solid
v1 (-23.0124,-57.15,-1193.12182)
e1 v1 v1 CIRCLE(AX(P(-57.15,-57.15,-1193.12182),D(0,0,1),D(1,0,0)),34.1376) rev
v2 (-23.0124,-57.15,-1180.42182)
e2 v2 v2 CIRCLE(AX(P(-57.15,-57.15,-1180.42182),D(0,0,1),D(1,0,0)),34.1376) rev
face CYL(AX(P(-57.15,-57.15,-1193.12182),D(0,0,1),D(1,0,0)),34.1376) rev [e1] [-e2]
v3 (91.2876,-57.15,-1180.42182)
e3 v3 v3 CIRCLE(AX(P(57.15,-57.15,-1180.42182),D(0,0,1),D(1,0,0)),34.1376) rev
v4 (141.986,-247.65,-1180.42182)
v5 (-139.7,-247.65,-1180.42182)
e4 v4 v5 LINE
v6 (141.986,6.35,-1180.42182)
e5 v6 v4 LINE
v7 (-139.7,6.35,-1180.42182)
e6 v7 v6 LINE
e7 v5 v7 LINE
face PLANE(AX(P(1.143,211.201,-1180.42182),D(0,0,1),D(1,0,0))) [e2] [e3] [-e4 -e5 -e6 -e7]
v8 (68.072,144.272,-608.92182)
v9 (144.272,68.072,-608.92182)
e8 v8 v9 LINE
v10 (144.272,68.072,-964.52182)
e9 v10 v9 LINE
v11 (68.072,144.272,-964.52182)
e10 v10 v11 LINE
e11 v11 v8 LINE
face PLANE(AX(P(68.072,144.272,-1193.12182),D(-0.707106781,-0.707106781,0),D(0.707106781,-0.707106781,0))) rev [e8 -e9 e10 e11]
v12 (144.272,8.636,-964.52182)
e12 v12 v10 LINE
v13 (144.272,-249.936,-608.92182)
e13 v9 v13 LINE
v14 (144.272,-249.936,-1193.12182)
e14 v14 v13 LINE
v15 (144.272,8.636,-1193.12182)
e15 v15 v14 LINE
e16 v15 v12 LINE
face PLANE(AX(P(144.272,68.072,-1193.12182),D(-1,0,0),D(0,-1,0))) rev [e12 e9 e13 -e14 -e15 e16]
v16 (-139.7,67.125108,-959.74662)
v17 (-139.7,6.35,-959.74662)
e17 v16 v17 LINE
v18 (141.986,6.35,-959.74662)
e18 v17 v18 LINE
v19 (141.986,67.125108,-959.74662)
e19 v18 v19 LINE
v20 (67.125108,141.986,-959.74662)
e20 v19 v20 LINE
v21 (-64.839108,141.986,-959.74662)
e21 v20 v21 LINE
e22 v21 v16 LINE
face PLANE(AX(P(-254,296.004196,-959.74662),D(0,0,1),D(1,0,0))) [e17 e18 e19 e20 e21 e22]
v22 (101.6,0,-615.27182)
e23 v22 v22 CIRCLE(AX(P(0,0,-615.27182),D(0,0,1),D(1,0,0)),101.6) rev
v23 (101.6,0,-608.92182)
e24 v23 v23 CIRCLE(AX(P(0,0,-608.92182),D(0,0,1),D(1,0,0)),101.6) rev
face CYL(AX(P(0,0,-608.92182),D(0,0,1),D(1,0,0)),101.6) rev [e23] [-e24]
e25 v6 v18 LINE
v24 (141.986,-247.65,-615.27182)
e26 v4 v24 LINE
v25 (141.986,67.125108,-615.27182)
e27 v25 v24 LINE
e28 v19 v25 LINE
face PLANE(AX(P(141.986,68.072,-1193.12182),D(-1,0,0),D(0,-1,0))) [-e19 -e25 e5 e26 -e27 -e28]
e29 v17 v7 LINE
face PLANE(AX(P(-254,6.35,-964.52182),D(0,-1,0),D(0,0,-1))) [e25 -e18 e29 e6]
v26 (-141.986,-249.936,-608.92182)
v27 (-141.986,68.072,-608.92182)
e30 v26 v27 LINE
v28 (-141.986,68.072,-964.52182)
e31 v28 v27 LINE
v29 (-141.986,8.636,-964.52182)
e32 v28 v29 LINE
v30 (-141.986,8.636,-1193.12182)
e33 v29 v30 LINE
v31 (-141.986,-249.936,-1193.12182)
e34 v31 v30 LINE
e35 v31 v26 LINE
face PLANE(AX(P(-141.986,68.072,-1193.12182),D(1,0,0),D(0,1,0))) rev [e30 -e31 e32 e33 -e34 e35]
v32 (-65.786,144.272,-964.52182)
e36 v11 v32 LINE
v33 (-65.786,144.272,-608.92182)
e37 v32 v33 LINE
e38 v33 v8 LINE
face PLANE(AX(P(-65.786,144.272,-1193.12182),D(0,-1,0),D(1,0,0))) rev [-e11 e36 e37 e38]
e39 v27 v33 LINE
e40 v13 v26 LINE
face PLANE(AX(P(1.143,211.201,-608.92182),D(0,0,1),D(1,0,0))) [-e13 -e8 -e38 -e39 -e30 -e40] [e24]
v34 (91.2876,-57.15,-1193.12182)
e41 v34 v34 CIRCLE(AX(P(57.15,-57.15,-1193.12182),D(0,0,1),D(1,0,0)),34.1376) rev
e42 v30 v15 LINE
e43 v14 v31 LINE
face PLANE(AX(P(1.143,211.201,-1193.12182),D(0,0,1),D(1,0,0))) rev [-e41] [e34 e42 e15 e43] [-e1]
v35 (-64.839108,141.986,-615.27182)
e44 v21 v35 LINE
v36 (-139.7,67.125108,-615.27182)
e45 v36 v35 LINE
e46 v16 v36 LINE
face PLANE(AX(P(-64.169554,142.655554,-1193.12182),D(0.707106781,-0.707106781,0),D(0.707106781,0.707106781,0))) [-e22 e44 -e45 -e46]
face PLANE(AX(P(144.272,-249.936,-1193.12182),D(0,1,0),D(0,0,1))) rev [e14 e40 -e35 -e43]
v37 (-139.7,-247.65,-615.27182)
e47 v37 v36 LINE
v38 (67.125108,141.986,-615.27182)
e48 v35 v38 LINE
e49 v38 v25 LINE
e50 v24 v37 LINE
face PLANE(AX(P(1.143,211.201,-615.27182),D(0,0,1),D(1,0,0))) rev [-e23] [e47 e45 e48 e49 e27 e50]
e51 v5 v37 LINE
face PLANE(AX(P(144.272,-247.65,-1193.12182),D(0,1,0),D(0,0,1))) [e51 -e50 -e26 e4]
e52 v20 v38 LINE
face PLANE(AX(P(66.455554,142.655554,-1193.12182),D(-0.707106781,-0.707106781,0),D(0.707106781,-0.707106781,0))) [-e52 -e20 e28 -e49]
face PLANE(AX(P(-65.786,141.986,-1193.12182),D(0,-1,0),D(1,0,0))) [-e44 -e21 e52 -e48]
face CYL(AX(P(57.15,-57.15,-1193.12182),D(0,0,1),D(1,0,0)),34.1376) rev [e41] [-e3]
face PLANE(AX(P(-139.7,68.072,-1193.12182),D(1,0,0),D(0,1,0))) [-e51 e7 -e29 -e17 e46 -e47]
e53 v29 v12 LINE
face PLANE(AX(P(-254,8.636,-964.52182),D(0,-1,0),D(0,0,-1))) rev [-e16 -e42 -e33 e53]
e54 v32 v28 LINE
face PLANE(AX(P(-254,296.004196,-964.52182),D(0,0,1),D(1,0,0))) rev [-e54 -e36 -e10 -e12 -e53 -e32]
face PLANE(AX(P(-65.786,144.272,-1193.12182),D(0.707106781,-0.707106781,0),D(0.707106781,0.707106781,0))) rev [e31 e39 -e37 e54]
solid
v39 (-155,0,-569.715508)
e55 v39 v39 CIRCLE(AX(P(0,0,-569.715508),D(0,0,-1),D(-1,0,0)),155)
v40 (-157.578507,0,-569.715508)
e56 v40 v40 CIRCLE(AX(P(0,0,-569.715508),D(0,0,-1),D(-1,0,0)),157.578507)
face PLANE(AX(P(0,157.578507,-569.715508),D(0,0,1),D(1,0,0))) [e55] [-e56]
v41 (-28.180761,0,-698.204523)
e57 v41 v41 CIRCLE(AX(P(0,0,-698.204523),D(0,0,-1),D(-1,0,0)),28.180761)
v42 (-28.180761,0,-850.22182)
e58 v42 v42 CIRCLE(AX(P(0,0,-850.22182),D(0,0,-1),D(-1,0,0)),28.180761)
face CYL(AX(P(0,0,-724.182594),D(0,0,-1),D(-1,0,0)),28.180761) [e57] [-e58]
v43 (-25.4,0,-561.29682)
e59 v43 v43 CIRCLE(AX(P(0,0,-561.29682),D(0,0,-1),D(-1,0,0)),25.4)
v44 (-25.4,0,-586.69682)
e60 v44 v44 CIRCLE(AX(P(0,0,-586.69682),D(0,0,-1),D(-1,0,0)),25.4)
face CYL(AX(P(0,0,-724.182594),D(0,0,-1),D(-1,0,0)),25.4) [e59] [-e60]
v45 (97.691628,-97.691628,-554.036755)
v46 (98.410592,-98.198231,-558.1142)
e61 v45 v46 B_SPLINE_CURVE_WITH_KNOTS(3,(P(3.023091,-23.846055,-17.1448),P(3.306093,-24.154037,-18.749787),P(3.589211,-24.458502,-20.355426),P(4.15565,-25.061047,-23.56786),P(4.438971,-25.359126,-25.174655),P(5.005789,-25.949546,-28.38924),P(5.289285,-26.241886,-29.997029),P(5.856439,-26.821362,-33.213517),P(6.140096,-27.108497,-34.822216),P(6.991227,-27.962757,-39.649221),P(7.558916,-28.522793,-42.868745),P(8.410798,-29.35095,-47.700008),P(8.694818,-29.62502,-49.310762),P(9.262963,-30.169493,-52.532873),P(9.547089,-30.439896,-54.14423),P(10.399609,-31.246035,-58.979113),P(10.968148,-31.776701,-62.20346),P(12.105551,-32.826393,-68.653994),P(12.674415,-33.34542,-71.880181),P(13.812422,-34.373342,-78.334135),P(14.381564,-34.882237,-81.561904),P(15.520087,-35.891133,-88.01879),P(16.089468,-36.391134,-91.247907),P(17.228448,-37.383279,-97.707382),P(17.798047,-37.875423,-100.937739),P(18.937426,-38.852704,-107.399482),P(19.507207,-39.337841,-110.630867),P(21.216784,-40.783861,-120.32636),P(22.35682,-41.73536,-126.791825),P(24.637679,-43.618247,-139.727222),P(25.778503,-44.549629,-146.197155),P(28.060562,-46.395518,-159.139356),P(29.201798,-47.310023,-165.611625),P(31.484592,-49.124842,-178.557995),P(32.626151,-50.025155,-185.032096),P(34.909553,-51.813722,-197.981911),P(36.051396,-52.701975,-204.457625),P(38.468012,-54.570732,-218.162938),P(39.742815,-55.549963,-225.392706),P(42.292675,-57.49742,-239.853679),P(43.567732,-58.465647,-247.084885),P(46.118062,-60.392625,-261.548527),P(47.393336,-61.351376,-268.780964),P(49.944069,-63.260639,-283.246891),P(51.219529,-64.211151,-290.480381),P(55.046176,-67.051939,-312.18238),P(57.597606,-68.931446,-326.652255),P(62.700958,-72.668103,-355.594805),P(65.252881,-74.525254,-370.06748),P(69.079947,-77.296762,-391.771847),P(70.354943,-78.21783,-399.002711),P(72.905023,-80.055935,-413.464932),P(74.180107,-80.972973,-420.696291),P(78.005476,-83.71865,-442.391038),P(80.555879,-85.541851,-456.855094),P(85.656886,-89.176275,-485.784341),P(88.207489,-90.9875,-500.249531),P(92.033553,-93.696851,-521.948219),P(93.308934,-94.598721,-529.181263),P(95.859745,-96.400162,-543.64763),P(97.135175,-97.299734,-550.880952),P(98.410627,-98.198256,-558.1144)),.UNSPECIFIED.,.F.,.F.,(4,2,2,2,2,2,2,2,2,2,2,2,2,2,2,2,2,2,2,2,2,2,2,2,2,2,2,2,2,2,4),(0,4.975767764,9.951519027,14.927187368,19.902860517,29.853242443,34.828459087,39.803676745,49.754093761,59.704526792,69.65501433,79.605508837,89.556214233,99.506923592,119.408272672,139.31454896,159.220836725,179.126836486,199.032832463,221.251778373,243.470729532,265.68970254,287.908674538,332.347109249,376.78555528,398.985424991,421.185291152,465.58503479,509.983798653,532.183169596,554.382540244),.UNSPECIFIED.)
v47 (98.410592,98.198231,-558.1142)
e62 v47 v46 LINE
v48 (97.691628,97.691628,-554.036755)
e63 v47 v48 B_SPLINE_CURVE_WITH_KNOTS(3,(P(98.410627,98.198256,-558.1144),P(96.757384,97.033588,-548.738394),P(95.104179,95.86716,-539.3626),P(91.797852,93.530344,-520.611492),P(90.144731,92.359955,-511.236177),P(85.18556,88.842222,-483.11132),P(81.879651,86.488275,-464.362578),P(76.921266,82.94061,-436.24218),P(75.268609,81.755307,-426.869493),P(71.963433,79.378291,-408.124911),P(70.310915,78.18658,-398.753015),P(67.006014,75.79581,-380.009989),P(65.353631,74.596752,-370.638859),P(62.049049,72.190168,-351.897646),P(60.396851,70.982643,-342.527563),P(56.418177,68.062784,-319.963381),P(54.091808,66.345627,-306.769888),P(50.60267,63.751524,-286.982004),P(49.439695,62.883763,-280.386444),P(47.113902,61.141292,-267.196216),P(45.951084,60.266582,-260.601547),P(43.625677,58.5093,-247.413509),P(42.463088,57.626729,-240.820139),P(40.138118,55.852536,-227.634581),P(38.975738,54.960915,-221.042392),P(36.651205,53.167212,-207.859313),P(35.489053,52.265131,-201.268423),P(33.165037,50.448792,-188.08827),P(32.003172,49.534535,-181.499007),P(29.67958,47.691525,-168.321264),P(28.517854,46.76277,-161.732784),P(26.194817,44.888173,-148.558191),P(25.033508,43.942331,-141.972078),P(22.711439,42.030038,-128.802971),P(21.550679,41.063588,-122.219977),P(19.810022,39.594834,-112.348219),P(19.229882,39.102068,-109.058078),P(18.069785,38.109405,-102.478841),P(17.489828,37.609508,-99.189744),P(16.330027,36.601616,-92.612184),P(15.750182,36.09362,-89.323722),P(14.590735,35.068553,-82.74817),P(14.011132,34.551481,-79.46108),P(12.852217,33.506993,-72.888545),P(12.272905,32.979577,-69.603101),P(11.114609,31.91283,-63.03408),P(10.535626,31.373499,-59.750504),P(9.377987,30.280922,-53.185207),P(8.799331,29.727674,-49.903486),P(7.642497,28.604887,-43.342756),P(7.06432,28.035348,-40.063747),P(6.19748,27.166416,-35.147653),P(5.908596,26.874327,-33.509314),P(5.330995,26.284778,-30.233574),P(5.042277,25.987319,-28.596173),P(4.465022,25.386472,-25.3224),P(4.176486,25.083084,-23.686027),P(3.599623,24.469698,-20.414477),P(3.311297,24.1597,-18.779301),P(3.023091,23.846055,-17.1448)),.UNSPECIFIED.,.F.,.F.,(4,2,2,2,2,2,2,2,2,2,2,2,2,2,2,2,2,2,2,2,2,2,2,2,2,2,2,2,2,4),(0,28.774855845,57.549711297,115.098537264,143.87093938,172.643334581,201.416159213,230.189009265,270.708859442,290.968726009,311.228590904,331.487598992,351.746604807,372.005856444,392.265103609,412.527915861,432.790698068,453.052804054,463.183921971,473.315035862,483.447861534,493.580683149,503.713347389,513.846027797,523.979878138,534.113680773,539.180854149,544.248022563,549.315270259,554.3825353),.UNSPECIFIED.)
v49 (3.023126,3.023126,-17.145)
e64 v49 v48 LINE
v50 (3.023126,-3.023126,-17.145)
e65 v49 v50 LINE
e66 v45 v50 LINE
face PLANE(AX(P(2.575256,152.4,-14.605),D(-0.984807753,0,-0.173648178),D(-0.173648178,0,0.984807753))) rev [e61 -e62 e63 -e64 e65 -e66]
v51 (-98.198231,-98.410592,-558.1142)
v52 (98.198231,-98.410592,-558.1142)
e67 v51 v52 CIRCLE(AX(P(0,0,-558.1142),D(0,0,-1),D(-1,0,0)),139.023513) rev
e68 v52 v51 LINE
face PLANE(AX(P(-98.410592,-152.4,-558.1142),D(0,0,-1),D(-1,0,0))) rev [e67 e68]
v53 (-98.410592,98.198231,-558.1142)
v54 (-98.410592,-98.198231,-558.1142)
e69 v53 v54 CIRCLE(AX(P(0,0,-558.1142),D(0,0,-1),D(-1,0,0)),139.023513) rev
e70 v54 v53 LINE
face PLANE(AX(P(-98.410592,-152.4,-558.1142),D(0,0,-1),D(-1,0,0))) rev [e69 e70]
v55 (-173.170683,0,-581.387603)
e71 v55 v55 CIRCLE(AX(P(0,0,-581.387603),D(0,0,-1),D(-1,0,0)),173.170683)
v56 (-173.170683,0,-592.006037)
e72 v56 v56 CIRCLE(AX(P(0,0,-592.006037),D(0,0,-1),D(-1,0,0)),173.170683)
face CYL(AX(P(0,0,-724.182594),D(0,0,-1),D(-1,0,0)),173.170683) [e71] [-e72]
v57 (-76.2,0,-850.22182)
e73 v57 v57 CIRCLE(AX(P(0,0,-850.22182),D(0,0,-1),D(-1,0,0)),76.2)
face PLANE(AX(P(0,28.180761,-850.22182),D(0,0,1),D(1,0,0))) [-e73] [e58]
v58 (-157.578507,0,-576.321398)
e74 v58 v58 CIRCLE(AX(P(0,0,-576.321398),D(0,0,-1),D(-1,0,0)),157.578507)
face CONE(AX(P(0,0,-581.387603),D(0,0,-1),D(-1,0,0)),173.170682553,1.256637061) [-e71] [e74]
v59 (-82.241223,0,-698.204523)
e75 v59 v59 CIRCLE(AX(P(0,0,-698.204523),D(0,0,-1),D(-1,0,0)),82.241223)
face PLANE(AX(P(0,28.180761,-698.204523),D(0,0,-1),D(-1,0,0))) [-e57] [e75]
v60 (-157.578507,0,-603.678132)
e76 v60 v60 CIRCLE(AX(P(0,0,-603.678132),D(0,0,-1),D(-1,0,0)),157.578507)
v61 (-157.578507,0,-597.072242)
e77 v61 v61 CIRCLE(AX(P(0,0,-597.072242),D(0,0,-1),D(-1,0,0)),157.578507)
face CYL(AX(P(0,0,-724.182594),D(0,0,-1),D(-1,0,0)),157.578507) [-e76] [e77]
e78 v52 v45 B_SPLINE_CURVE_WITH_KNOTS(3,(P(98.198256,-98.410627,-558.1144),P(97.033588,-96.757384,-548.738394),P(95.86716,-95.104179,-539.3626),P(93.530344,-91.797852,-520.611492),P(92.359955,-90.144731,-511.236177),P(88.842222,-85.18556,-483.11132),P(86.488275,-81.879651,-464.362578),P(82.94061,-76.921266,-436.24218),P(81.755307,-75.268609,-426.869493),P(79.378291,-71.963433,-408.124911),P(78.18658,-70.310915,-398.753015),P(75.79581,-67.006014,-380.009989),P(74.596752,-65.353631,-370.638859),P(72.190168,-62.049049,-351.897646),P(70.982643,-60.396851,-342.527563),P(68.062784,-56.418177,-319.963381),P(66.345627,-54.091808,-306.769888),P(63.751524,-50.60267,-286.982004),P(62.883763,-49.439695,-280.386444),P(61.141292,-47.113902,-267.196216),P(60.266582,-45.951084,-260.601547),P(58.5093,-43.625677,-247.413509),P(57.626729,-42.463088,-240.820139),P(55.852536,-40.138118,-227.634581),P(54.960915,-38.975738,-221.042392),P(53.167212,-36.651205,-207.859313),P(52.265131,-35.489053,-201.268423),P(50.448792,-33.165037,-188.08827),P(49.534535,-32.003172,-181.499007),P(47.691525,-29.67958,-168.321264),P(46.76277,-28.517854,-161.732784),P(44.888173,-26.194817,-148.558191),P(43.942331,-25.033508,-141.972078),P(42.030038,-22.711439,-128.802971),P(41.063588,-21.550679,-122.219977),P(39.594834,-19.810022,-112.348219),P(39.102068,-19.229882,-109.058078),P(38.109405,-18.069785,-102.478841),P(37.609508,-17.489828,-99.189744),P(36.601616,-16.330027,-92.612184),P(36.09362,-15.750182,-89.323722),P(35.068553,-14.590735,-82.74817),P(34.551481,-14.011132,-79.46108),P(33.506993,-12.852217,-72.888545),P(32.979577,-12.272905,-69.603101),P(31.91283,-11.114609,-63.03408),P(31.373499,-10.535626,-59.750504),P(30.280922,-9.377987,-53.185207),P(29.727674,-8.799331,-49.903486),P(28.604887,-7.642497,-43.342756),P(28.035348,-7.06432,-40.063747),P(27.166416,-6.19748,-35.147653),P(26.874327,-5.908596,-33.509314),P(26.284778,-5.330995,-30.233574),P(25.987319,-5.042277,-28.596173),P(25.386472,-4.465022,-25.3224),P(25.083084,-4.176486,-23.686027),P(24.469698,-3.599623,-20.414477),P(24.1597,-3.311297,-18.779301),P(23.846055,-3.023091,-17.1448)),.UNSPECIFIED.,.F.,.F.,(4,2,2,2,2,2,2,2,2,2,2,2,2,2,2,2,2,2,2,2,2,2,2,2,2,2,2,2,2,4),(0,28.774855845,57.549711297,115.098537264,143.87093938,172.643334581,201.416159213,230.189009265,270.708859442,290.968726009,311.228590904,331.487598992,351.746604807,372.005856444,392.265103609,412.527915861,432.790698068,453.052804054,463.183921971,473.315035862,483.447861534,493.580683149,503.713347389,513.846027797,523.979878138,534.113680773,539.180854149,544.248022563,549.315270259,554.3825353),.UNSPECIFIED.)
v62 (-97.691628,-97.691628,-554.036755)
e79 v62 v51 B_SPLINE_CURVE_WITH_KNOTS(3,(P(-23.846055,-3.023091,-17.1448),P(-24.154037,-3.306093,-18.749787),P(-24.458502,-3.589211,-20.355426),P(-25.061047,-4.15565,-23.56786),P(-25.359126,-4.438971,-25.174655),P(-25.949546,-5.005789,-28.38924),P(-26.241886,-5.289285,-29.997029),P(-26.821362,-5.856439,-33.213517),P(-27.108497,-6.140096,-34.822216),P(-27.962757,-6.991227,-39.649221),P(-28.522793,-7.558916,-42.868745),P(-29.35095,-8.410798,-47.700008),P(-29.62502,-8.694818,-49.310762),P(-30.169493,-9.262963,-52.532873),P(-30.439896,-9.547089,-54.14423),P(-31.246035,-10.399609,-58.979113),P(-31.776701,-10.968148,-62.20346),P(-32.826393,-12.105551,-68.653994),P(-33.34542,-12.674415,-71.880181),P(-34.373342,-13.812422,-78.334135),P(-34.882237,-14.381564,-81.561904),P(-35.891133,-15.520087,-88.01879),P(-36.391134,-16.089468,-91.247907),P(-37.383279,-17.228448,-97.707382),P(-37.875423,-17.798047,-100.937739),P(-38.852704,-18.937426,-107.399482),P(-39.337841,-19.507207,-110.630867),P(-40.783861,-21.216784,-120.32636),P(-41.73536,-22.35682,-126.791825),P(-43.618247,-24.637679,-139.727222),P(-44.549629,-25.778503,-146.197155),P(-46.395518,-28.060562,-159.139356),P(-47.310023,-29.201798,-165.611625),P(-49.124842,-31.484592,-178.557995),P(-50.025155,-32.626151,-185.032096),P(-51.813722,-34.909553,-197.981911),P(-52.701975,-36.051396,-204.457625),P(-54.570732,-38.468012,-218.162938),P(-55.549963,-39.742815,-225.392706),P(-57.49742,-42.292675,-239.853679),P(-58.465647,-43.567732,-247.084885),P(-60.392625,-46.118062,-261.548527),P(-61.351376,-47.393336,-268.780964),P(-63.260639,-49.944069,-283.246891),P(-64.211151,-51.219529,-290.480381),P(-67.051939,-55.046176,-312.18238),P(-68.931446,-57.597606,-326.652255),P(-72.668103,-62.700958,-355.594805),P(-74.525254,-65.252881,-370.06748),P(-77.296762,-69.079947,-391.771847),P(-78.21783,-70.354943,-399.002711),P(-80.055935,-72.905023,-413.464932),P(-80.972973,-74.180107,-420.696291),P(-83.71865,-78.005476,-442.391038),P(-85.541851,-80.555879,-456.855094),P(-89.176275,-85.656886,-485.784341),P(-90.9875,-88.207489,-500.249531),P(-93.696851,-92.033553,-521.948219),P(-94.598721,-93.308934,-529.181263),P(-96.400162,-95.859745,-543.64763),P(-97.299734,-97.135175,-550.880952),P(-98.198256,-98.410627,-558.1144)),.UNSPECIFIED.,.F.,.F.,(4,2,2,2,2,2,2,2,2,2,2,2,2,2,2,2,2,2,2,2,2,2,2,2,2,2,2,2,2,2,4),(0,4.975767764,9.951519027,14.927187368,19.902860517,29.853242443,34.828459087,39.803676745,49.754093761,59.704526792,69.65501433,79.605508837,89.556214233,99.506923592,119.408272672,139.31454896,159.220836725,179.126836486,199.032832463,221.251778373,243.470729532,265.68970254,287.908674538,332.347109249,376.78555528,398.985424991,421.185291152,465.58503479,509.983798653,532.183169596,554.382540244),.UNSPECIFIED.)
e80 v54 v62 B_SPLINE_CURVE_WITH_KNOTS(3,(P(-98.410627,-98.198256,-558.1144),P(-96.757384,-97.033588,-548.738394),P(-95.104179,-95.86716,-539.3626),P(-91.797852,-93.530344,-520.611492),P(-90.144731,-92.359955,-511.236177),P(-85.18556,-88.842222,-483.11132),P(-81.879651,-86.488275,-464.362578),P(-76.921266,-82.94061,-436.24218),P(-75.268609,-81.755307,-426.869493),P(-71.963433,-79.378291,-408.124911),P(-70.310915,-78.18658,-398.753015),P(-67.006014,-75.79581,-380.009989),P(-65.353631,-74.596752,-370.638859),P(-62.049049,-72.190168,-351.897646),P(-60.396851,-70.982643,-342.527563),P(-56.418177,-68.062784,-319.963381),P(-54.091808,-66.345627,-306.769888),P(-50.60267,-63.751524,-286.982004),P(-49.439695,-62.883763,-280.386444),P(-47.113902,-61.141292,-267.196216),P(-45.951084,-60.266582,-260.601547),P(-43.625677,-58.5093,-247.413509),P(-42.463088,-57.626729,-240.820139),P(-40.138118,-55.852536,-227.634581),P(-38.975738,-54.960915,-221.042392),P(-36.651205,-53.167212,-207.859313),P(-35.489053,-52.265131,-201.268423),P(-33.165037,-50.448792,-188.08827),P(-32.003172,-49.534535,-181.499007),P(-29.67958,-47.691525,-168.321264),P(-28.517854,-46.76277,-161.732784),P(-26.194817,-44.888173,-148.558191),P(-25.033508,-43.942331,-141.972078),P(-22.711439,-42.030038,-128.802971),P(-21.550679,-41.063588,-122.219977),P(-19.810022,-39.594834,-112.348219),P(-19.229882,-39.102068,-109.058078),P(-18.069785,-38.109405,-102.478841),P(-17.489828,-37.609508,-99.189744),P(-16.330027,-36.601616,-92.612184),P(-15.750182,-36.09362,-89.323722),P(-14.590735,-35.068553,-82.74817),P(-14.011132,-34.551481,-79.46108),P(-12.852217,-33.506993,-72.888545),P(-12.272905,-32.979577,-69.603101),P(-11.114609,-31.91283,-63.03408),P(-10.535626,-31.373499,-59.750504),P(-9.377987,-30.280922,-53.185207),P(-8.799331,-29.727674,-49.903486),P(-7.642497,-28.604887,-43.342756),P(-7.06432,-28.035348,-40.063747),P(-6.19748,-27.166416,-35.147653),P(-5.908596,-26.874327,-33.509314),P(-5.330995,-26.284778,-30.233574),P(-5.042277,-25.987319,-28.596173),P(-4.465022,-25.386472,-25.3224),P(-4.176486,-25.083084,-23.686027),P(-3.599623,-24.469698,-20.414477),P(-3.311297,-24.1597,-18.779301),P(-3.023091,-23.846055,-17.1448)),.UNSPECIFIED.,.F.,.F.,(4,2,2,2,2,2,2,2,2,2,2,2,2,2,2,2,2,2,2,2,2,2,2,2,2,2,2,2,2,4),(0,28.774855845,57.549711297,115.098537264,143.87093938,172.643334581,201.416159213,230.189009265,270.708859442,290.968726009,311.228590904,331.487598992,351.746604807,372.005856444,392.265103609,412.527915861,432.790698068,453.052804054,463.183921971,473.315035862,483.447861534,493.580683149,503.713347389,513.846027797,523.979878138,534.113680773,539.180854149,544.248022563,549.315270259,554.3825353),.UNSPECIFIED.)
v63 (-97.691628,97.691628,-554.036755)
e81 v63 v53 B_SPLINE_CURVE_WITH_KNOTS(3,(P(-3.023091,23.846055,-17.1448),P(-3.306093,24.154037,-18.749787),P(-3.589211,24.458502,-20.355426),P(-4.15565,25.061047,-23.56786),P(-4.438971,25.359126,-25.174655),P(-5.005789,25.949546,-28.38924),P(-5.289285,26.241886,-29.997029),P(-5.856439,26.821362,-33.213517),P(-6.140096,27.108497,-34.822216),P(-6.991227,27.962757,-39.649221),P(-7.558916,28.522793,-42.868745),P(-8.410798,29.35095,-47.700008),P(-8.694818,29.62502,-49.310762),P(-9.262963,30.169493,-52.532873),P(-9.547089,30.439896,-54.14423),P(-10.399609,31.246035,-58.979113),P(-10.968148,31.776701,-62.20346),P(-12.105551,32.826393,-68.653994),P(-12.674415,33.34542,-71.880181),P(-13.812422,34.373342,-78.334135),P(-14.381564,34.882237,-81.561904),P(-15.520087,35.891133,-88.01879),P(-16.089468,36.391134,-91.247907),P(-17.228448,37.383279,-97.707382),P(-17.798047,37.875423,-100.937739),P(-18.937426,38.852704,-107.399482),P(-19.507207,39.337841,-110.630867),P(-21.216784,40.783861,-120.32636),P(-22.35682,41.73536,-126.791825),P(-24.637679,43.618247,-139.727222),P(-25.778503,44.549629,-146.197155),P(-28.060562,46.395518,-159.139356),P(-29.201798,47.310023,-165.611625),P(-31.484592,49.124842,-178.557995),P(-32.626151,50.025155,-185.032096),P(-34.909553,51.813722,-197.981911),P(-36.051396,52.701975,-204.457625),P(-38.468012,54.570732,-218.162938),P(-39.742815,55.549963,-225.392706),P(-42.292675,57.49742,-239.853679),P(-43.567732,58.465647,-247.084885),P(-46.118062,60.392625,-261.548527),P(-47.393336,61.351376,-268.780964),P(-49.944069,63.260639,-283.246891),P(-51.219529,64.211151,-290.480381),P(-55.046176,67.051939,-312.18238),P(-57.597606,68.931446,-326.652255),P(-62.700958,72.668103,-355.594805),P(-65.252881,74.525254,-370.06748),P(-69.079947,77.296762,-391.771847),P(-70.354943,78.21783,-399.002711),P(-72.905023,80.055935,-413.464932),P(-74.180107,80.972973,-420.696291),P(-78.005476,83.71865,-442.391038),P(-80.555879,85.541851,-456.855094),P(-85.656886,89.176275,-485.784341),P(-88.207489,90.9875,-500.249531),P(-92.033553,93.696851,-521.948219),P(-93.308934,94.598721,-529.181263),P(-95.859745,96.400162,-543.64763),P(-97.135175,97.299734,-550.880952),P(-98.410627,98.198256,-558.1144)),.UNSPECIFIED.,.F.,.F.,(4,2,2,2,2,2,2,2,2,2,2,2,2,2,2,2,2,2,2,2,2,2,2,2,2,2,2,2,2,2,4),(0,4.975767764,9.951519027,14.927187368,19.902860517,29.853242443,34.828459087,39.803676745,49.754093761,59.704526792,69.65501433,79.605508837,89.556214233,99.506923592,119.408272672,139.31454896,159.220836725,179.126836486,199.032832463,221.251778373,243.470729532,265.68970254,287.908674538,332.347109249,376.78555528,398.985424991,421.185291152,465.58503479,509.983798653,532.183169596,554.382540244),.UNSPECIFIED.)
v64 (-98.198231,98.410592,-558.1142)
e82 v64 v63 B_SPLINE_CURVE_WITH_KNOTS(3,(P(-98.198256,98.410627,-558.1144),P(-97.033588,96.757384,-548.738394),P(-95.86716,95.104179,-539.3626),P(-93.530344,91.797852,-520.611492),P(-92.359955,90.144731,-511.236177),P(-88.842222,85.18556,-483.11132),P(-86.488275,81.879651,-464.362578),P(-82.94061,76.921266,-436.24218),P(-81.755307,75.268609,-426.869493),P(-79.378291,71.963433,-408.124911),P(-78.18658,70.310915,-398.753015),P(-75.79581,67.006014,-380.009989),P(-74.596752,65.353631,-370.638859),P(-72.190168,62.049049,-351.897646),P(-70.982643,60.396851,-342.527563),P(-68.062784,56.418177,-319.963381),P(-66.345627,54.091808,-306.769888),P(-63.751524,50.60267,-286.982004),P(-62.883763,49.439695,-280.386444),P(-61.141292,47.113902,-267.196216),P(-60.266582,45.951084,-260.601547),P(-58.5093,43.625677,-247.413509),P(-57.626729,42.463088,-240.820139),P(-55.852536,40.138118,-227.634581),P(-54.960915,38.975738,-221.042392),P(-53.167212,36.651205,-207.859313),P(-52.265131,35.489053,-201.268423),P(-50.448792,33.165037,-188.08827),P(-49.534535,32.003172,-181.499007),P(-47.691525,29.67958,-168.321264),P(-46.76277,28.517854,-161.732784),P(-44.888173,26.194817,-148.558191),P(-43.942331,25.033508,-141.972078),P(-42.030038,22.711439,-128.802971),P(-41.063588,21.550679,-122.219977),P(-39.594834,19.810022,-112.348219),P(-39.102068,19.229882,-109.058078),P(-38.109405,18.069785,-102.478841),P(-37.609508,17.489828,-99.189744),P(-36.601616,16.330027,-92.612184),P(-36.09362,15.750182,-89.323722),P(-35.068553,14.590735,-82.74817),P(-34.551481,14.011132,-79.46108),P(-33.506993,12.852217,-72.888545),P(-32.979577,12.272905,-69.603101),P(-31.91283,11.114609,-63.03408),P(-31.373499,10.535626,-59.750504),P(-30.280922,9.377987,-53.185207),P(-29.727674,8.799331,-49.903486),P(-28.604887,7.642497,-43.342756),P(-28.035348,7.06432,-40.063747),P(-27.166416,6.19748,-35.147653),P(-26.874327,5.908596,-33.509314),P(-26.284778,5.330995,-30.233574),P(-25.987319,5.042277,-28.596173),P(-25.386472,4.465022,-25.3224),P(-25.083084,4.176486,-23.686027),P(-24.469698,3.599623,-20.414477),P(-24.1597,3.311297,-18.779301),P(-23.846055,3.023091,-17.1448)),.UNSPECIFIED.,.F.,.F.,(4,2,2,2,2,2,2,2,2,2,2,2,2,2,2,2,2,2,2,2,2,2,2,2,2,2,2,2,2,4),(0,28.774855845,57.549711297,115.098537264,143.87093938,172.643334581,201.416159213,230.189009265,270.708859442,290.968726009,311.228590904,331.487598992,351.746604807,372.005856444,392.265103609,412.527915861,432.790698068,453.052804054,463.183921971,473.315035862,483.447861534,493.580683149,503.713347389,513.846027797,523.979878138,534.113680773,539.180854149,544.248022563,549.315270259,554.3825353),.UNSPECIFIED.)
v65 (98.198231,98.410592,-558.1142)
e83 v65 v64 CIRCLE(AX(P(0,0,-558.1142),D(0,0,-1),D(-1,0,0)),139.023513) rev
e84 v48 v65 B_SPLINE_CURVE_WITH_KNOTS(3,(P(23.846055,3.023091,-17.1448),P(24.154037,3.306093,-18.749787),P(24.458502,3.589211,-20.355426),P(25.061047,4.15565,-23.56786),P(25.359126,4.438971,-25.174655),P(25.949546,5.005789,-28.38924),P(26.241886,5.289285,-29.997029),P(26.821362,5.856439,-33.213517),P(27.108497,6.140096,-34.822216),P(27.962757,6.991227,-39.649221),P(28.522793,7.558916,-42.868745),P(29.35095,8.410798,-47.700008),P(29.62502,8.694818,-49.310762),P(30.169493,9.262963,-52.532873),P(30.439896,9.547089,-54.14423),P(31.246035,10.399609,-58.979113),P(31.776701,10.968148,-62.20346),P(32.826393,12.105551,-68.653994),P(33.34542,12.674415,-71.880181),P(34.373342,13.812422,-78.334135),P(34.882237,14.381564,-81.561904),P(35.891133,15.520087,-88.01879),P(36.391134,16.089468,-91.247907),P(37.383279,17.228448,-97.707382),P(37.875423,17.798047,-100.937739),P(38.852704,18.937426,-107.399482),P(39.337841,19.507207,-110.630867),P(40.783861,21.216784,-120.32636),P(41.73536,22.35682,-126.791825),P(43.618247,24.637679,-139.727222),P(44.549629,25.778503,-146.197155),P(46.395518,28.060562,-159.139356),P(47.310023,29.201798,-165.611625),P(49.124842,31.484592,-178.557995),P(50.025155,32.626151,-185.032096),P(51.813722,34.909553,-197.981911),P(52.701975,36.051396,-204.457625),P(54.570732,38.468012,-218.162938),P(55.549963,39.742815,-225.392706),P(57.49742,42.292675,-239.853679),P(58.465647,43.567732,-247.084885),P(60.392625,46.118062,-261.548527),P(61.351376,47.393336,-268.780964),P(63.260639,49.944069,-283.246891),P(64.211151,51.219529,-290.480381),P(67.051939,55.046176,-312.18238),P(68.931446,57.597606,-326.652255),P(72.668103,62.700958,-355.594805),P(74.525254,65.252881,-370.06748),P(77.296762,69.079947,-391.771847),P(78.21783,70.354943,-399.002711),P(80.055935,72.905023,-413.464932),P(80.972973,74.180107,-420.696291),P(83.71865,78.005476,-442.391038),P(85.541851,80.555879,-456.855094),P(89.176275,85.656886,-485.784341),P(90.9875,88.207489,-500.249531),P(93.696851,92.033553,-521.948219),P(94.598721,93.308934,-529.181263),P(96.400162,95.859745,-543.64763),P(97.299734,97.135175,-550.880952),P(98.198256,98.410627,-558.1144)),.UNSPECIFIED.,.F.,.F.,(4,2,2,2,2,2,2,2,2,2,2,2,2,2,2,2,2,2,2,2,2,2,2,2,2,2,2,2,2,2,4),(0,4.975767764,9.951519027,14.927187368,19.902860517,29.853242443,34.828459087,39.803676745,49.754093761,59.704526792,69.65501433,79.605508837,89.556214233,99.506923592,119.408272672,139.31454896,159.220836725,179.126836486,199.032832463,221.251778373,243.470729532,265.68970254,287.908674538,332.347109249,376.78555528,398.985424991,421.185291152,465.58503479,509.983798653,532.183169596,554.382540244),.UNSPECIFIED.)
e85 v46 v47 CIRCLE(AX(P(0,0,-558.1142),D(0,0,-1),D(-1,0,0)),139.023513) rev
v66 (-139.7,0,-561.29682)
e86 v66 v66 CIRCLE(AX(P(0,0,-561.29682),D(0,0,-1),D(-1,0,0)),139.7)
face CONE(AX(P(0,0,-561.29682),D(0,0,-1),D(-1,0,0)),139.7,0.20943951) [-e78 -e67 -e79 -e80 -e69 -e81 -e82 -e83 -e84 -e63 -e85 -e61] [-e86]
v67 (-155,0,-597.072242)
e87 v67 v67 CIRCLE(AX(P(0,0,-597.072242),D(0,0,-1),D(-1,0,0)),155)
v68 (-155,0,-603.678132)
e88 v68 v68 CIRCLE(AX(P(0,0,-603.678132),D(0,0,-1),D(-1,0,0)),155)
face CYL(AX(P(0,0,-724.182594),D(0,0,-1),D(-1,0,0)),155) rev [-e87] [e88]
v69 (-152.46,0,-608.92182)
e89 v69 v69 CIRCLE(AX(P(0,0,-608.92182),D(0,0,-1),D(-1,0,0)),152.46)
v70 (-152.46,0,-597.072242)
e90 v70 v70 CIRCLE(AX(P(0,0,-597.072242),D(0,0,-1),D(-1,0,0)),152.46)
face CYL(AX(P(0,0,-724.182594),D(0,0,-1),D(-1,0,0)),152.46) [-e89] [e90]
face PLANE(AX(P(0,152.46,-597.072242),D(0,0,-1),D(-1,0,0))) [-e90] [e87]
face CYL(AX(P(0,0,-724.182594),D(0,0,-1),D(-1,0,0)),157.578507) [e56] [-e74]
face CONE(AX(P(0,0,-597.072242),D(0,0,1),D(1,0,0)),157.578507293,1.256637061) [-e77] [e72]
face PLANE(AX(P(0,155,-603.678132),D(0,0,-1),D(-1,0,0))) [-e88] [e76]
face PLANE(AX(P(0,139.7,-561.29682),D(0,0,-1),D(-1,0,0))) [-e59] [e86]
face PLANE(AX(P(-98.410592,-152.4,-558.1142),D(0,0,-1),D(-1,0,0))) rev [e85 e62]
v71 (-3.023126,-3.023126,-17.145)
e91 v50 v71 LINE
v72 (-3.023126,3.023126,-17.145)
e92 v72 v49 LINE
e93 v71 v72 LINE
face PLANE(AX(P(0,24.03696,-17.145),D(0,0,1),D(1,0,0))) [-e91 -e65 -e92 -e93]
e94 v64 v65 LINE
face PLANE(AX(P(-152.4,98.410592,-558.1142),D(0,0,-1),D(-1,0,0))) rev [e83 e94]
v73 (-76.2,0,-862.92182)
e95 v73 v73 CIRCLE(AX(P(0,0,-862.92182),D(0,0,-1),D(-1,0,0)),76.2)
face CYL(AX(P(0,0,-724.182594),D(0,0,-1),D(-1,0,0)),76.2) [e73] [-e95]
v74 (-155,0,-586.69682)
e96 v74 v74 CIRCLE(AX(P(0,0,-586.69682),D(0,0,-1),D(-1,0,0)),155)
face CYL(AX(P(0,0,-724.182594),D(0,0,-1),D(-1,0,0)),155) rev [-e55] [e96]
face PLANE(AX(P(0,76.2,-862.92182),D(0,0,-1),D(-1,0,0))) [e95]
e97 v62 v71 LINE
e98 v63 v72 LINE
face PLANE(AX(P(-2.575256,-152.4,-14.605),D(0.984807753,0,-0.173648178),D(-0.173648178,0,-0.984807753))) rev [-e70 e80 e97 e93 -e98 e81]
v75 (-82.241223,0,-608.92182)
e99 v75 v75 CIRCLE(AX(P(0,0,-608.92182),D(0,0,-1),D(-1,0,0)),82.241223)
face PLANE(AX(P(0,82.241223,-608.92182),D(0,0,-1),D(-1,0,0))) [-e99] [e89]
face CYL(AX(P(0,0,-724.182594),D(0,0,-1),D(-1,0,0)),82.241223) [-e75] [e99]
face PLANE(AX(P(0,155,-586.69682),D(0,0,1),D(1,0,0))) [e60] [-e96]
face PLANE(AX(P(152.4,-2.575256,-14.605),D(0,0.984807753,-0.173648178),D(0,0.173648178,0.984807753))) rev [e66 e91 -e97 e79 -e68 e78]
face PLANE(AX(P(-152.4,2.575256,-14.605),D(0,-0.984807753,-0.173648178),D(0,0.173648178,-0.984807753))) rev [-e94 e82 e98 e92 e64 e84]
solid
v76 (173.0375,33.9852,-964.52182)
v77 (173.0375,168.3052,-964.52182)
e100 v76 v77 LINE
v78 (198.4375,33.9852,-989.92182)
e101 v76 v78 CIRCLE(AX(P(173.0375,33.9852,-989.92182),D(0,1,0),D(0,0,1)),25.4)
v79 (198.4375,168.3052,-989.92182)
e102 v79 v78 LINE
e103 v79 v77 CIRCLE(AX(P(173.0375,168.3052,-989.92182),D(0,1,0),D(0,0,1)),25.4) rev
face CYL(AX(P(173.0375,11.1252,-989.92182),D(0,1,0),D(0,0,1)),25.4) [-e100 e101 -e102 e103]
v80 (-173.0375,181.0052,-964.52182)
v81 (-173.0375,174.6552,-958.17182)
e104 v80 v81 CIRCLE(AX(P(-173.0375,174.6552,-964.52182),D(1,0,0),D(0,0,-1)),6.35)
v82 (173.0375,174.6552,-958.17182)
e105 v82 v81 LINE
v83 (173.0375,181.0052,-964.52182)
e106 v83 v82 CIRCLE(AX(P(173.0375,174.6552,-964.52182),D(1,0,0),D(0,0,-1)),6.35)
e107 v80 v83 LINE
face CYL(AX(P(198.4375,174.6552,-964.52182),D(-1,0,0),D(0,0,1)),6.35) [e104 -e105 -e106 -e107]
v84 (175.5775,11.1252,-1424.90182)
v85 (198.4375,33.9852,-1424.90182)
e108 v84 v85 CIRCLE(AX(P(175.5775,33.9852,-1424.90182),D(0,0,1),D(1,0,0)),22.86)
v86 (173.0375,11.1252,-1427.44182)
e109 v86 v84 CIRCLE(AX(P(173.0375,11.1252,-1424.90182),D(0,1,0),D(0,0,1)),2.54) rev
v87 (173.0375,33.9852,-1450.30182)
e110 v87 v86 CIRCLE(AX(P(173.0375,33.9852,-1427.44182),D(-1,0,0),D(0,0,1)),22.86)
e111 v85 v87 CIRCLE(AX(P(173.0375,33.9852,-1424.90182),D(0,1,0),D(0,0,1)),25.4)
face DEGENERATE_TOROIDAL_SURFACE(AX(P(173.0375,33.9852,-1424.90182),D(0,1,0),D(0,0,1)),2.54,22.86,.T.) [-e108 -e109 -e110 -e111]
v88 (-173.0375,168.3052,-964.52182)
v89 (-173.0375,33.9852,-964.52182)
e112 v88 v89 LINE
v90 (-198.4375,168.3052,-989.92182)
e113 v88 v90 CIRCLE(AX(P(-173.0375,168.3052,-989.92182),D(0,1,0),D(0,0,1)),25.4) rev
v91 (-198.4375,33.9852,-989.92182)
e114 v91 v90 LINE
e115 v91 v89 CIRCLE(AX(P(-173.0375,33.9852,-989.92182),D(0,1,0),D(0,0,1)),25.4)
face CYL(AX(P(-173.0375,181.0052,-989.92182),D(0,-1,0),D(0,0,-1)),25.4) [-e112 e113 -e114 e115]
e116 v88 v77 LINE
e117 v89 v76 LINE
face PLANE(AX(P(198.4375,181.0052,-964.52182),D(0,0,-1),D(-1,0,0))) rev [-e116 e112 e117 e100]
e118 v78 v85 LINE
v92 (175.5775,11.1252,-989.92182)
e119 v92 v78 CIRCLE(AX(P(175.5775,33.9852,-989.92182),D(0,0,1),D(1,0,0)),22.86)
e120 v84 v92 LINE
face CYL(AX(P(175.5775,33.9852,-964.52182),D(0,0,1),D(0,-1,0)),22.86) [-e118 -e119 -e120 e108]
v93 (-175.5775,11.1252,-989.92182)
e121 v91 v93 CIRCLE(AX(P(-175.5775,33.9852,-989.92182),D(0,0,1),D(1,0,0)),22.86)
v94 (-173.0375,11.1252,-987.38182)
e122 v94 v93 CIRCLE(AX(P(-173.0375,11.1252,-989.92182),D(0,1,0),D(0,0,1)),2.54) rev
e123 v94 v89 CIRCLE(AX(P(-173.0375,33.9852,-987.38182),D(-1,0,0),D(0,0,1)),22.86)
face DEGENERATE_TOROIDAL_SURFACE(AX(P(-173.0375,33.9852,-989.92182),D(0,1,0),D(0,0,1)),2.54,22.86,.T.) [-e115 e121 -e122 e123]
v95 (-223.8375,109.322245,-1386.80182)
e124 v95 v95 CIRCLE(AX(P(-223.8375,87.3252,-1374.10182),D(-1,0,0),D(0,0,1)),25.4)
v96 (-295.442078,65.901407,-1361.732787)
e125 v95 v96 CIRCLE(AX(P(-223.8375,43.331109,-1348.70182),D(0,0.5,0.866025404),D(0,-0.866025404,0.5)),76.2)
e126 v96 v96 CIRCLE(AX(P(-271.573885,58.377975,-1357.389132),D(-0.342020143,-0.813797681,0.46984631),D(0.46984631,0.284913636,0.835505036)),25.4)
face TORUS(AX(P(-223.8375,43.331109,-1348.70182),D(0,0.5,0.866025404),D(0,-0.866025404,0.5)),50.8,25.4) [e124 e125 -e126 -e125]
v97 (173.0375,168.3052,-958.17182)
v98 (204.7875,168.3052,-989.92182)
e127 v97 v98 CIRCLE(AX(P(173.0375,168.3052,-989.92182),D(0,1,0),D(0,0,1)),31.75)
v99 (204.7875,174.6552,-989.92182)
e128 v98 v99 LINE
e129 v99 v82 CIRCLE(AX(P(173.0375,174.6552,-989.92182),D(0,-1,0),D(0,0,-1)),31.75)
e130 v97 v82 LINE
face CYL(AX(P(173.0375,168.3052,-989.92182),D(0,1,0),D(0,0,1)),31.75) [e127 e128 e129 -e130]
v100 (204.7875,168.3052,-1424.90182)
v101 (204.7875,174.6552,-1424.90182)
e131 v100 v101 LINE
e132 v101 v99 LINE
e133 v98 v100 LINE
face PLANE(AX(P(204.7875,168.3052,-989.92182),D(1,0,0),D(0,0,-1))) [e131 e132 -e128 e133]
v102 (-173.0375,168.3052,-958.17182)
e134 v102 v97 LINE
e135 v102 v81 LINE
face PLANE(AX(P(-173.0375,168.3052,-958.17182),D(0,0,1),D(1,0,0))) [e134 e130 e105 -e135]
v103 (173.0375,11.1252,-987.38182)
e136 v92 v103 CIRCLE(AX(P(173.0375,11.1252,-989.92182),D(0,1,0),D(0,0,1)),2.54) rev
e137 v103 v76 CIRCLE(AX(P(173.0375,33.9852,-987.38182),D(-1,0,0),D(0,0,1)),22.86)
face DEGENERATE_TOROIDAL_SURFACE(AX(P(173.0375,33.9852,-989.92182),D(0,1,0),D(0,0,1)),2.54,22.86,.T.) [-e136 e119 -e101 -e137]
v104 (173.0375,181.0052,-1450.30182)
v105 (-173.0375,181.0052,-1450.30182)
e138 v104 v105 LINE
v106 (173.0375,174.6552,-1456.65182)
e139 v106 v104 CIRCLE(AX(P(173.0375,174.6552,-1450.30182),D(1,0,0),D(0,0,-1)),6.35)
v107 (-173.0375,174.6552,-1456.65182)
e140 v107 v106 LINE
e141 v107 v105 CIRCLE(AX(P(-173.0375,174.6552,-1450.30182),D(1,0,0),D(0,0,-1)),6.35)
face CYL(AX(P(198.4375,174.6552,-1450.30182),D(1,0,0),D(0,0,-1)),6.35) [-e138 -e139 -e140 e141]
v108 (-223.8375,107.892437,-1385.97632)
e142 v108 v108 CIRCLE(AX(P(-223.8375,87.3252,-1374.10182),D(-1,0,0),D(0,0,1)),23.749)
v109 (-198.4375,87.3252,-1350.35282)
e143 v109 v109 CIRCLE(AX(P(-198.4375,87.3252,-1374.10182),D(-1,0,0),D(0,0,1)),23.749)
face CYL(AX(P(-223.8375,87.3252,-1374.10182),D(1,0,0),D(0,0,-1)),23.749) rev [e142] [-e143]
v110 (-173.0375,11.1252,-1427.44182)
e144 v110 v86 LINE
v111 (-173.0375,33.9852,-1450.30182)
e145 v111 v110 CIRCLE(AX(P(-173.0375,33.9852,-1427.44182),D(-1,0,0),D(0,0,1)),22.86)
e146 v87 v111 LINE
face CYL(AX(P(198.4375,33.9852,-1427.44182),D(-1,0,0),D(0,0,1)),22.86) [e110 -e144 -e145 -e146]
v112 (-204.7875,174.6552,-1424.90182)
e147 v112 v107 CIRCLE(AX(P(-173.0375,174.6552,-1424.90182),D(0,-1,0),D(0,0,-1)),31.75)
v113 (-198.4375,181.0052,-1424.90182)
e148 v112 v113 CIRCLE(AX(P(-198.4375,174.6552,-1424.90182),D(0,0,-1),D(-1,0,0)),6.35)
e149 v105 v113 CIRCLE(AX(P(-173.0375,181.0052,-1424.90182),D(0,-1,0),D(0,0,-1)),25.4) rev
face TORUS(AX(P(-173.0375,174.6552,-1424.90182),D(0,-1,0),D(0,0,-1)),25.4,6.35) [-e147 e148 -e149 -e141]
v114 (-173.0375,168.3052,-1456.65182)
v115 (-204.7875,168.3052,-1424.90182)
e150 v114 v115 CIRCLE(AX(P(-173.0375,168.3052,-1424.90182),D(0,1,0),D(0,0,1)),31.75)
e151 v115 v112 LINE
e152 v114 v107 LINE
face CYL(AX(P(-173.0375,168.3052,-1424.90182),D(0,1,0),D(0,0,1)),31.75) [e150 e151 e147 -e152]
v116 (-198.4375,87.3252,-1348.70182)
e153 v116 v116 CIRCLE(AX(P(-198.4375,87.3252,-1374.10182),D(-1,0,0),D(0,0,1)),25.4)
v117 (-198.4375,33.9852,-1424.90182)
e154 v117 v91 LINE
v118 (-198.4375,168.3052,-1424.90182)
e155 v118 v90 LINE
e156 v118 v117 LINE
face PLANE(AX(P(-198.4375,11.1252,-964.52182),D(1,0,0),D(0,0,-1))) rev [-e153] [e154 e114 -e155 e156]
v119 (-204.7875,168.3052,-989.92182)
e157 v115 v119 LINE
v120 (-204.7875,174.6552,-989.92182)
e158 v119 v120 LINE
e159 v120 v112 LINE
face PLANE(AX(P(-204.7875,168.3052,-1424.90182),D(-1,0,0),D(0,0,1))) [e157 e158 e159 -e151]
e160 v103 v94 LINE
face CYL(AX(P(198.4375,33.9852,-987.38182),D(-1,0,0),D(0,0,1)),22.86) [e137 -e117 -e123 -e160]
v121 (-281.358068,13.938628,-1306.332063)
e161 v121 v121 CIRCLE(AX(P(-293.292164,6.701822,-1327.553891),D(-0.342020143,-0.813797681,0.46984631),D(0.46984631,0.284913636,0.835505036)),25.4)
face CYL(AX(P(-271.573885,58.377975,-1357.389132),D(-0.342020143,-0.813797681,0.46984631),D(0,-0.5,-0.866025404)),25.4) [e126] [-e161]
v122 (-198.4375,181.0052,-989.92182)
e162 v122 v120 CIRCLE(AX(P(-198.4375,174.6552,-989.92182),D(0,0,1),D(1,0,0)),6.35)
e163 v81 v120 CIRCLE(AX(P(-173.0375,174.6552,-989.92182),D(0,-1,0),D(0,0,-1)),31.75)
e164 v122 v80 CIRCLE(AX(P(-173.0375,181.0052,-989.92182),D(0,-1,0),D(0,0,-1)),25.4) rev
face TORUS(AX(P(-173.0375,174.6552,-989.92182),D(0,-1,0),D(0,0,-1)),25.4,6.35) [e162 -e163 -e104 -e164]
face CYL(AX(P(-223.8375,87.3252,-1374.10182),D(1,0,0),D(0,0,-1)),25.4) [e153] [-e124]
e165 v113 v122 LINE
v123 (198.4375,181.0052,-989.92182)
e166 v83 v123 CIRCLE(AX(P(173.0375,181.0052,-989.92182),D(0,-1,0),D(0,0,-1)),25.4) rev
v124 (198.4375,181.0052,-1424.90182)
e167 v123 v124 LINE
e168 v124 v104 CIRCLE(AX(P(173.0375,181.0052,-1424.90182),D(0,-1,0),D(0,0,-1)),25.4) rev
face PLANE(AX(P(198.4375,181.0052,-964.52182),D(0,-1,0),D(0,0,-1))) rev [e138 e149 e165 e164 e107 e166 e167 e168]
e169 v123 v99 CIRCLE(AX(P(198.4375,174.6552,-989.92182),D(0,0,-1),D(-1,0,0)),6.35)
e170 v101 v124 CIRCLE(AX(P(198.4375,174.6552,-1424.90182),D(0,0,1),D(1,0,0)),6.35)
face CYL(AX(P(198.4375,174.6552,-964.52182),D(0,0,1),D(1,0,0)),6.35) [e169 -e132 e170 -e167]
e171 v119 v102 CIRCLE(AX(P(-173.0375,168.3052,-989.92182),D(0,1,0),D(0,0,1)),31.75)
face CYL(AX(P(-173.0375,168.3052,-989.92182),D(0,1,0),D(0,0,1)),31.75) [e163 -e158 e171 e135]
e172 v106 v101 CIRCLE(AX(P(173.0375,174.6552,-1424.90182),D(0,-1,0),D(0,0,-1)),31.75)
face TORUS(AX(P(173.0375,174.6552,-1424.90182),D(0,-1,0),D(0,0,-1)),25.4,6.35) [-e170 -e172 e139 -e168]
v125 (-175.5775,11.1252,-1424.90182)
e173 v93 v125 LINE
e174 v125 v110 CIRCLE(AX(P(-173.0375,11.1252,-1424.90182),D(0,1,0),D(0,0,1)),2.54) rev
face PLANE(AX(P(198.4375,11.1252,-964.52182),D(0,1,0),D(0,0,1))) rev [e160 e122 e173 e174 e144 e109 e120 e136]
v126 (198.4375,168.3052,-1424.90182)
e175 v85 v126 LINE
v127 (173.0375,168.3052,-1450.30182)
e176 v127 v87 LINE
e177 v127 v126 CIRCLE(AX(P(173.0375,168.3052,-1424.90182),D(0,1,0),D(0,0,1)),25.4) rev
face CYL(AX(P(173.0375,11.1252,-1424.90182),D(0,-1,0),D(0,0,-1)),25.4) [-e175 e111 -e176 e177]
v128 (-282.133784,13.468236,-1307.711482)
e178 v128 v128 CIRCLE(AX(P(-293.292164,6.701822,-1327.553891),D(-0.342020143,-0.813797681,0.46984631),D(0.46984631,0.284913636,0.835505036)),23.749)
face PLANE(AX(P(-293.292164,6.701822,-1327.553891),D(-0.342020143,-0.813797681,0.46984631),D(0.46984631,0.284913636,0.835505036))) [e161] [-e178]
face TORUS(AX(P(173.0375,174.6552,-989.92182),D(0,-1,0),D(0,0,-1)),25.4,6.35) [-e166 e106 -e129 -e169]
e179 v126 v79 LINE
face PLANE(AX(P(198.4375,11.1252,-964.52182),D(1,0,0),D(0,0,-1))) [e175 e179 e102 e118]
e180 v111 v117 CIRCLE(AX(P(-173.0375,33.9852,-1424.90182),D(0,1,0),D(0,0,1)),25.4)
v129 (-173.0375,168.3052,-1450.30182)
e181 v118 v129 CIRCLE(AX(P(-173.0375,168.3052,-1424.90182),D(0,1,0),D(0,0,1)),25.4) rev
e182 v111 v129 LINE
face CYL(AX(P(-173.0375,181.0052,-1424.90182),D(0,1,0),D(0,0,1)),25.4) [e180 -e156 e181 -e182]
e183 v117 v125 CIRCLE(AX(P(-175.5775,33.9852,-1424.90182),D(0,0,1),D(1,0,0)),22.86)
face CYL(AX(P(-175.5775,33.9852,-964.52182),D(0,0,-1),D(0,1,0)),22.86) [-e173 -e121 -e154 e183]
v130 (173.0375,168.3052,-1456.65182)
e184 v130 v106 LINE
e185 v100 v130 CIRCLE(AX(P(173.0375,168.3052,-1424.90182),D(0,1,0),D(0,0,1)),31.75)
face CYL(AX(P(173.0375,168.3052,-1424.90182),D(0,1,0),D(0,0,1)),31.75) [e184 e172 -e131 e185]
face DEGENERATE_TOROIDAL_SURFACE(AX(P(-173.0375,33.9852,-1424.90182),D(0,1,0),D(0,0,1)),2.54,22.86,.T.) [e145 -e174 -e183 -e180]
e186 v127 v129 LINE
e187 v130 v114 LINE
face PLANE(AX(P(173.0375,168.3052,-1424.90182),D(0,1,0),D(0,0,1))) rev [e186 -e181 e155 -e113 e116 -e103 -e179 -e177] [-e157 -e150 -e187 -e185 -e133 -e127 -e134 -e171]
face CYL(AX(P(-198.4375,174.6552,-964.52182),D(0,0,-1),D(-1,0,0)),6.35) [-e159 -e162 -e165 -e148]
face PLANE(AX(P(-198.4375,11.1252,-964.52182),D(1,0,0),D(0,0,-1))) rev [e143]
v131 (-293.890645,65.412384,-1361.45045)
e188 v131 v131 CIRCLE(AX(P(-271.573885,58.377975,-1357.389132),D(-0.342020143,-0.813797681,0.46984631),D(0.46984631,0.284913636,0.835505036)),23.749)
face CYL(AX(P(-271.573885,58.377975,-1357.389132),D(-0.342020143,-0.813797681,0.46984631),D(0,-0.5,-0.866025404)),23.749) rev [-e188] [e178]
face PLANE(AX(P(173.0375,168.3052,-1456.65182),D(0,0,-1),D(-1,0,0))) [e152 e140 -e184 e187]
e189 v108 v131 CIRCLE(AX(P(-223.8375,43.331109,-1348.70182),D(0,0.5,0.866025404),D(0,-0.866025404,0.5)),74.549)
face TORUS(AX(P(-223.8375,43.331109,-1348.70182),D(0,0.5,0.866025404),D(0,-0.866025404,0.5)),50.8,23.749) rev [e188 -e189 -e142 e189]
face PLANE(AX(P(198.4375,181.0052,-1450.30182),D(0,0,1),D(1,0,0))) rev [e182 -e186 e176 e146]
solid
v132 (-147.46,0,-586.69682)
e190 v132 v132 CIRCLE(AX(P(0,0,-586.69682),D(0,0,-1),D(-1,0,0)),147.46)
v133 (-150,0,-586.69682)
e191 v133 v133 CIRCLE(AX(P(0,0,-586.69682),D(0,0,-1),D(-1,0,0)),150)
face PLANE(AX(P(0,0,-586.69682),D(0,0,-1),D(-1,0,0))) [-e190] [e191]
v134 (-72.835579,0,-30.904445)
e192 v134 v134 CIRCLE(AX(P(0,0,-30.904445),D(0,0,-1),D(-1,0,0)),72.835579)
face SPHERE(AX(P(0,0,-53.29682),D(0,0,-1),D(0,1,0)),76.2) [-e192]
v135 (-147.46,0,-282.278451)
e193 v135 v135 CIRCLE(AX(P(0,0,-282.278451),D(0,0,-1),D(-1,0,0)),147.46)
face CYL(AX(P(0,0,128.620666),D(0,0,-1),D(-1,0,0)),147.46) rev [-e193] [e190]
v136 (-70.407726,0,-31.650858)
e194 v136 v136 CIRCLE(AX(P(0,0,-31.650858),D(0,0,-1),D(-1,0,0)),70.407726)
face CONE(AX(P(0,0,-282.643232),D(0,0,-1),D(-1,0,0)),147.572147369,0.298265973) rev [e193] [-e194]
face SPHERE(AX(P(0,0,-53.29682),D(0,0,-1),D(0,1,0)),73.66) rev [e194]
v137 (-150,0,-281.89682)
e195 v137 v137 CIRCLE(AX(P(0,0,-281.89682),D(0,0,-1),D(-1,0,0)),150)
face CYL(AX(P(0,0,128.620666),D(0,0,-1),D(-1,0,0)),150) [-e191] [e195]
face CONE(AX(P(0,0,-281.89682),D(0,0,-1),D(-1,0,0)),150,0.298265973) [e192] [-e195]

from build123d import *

# Parameters (mm, degrees)
CE_00_PYRAMID_FACE_DEPTH    = 152.4
CP_00_PYRAMID_FACES_COUNT   = 4
BOSS_EXTRUDE1_DEPTH         = 584.2
SKETCH12_W                  = 287.368195874
SKETCH12_H                  = 287.368195874
CUT_EXTRUDE6_DEPTH          = 254
SHELL8_START                = -1180.42182
SHELL8_OUTLINE_W            = 281.686
SHELL8_OUTLINE_H            = 254
SHELL8_DEPTH                = 565.15
SHELL8_START_2              = -959.74662
SHELL8_2_DEPTH              = 344.4748
SHELL8_START_3              = -615.27182
SHELL8_3_OUTLINE_R          = 101.6
SHELL8_3_DEPTH              = 6.35
SHELL8_START_4              = -1193.12182
SHELL8_4_OUTLINE_R          = 34.1376
SHELL8_4_DEPTH              = 12.7
SH_00_DOME_SHELL_T          = -2.54
SKETCH8_W                   = 485.78
SKETCH8_H                   = 169.88
BE_00_PAX_CASE_BOTTOM_DEPTH = 198.4375
FILLET1_R                   = 25.4
FILLET2_R                   = 22.86
BE_00_PAX_CASE_TOP_DEPTH    = 12.7
FILLET3_R                   = 6.35
SKETCH16_R                  = 25.4
SKETCH16_R_2                = 23.749


# Read off the part's stored shape, not the designer's step: Shell8
with BuildPart() as part:
    # Sketch1 → BR-00 Base Plate & Feed (revolve)
    with BuildSketch(Plane(origin=(0, 0, 0), x_dir=(0, 0, -1), z_dir=(1, 0, 0)), mode=Mode.PRIVATE) as br_00_base_plate_feed_sk:
        Polygon((586.69682, 155), (586.69682, 25.4), (561.29682, 25.4), (561.29682, 139.7), (17.145, 24.036960114), (17.145, 0), (862.92182, 0), (862.92182, 76.2), (850.22182, 76.2), (850.22182, 28.18076073), (698.204523227, 28.18076073), (698.204523227, 82.241223084), (608.92182, 82.241223084), (608.92182, 152.46), (597.072242205, 152.46), (597.072242205, 155), (603.678132318, 155), (603.678132318, 157.578507293), (597.072242205, 157.578507293), (592.006037356, 173.170682553), (581.387602644, 173.170682553), (576.321397795, 157.578507293), (569.715507682, 157.578507293), (569.715507682, 155), align=None)
    revolve(br_00_base_plate_feed_sk.sketch.rotate(Axis((0, 0, -724.182594249), (0, 0, 1)), 90), axis=Axis((0, 0, -724.182594249), (0, 0, 1)))

    # Sketch2 → CE-00 Pyramid Face (cut, symmetric)
    with BuildSketch(Plane(origin=(0, 0, 0), x_dir=(0, 0, -1), z_dir=(1, 0, 0))):
        Polygon((14.605, 2.575255553), (558.1142, 98.410591777), (558.1142, 230.90250219), (14.605, 230.90250219), align=None)
    ce_00_pyramid_face = extrude(amount=CE_00_PYRAMID_FACE_DEPTH, both=True, mode=Mode.SUBTRACT)

    # CP-00 Pyramid Faces: CE-00 Pyramid Face ×4 about axis
    cp_00_pyramid_faces_axis = Axis((0, 0, 0), (0, 0, 1))
    for i in range(1, CP_00_PYRAMID_FACES_COUNT):
        add(ce_00_pyramid_face.rotate(cp_00_pyramid_faces_axis, i * 360 / CP_00_PYRAMID_FACES_COUNT), mode=Mode.SUBTRACT)


with BuildPart() as body_2:
    # Sketch3 → Boss-Extrude1 (new body)
    with BuildSketch(Plane(origin=(0, 0, -608.92182), x_dir=(-1, 0, 0), z_dir=(0, 0, -1))):
        Polygon((65.786, 144.272), (-68.072, 144.272), (-144.272, 68.072), (-144.272, -249.936), (141.986, -249.936), (141.986, 68.072), align=None)
    extrude(amount=BOSS_EXTRUDE1_DEPTH)

    # Sketch12 → Cut-Extrude6 (cut, symmetric)
    with BuildSketch(Plane(origin=(0, 0, 0), x_dir=(0, 0, -1), z_dir=(1, 0, 0))):
        with Locations((1108.205917937, 152.320097937)):
            Rectangle(SKETCH12_W, SKETCH12_H)
    extrude(amount=CUT_EXTRUDE6_DEPTH, both=True, mode=Mode.SUBTRACT)

    # Shell8 outline → Shell8 (cut)
    with BuildSketch(Plane.XY.offset(SHELL8_START)):
        with Locations((1.143, -120.65)):
            Rectangle(SHELL8_OUTLINE_W, SHELL8_OUTLINE_H)
    extrude(amount=SHELL8_DEPTH, mode=Mode.SUBTRACT)

    # Shell8 2 outline → Shell8 2 (cut)
    with BuildSketch(Plane.XY.offset(SHELL8_START_2)):
        Polygon((141.986, 6.35), (141.986, 67.125107796), (67.125107796, 141.986), (-64.839107796, 141.986), (-139.7, 67.125107796), (-139.7, 6.35), align=None)
    extrude(amount=SHELL8_2_DEPTH, mode=Mode.SUBTRACT)

    # Shell8 3 outline → Shell8 3 (cut)
    with BuildSketch(Plane.XY.offset(SHELL8_START_3)):
        Circle(SHELL8_3_OUTLINE_R)
    extrude(amount=SHELL8_3_DEPTH, mode=Mode.SUBTRACT)

    # Shell8 4 outline → Shell8 4 (cut)
    with BuildSketch(Plane.XY.offset(SHELL8_START_4)):
        with Locations((57.15, -57.15)):
            Circle(SHELL8_4_OUTLINE_R)
        with Locations((-57.15, -57.15)):
            Circle(SHELL8_4_OUTLINE_R)
    extrude(amount=SHELL8_4_DEPTH, mode=Mode.SUBTRACT)


with BuildPart() as body_3:
    # Sketch5 → BR-00 Dome Body (revolve)
    with BuildSketch(Plane(origin=(0, 0, 0), x_dir=(0, 0, -1), z_dir=(1, 0, 0)), mode=Mode.PRIVATE) as br_00_dome_body_sk:
        with BuildLine():
            Line((586.69682, 150), (281.89682, 150))
            Line((281.89682, 150), (30.904445372, 72.835578933))
            ThreePointArc((30.904445372, 72.835578933), (-7.992408037, 45.277704521), (-22.90318, 0))
            Line((-22.90318, 0), (586.69682, 0))
            Line((586.69682, 0), (586.69682, 150))
        make_face()
    revolve(br_00_dome_body_sk.sketch.rotate(Axis((0, 0, 128.620665572), (0, 0, 1)), 90), axis=Axis((0, 0, 128.620665572), (0, 0, 1)))

    # SH-00 Dome Shell
    sh_00_dome_shell_openings = [body_3.faces().sort_by_distance(p)[0] for p in [
        (0, 0, -586.69682),
    ]]
    offset(amount=SH_00_DOME_SHELL_T, openings=sh_00_dome_shell_openings, kind=Kind.INTERSECTION)


with BuildPart() as body_4:
    # Sketch8 → BE-00 PAX Case Bottom (new, symmetric)
    with BuildSketch(Plane(origin=(0, 0, 0), x_dir=(0, 0, -1), z_dir=(1, 0, 0))):
        with Locations((1207.41182, 96.0652)):
            Rectangle(SKETCH8_W, SKETCH8_H)
    extrude(amount=BE_00_PAX_CASE_BOTTOM_DEPTH, both=True)

    # Fillet1
    fillet1_edges = [body_4.edges().sort_by_distance(p)[0] for p in [
        (198.4375, 96.0652, -1450.30182),
        (198.4375, 96.0652, -964.52182),
        (-198.4375, 96.0652, -1450.30182),
        (-198.4375, 96.0652, -964.52182),
    ]]
    fillet(fillet1_edges, radius=FILLET1_R)

    # Fillet2
    fillet2_edges = [body_4.edges().sort_by_distance(p)[0] for p in [
        (0, 11.1252, -1450.30182),
        (-198.4375, 11.1252, -1207.41182),
        (198.4375, 11.1252, -1207.41182),
        (0, 11.1252, -964.52182),
        (190.998012242, 11.1252, -971.961307758),
        (-190.998012242, 11.1252, -971.961307758),
        (190.998012242, 11.1252, -1442.862332242),
        (-190.998012242, 11.1252, -1442.862332242),
    ]]
    fillet(fillet2_edges, radius=FILLET2_R)

    # Sketch9 → BE-00 PAX Case Top (add)
    with BuildSketch(Plane(origin=(0, 181.0052, 0), x_dir=(1, 0, 0), z_dir=(0, 1, 0))):
        with BuildLine():
            Line((173.0375, 1456.65182), (-173.0375, 1456.65182))
            ThreePointArc((-173.0375, 1456.65182), (-195.488140303, 1447.352460303), (-204.7875, 1424.90182))
            Line((-204.7875, 1424.90182), (-204.7875, 989.92182))
            ThreePointArc((-204.7875, 989.92182), (-195.488140303, 967.471179697), (-173.0375, 958.17182))
            Line((-173.0375, 958.17182), (173.0375, 958.17182))
            ThreePointArc((173.0375, 958.17182), (195.488140303, 967.471179697), (204.7875, 989.92182))
            Line((204.7875, 989.92182), (204.7875, 1424.90182))
            ThreePointArc((204.7875, 1424.90182), (195.488140303, 1447.352460303), (173.0375, 1456.65182))
        make_face()
    extrude(amount=-BE_00_PAX_CASE_TOP_DEPTH)

    # Fillet3
    fillet3_edges = [body_4.edges().sort_by_distance(p)[0] for p in [
        (195.488140303, 181.0052, -1447.352460303),
        (0, 181.0052, -1456.65182),
        (-195.488140303, 181.0052, -1447.352460303),
        (-204.7875, 181.0052, -1207.41182),
        (-195.488140303, 181.0052, -967.471179697),
        (0, 181.0052, -958.17182),
        (195.488140303, 181.0052, -967.471179697),
        (204.7875, 181.0052, -1207.41182),
    ]]
    fillet(fillet3_edges, radius=FILLET3_R)

    # Sweep1: sweep along a path in Sketch15
    with BuildLine(Plane(origin=(0, -573.172241753, -992.763444205), x_dir=(0, -0.8660254037844386, 0.5000000000000001), z_dir=(0, 0.5000000000000001, 0.8660254037844386))) as sweep1_path:
        Line((-762.676751591, -198.4375), (-762.676751591, -223.8375))
        ThreePointArc((-762.676751591, -223.8375), (-753.48967544, -252.975182967), (-729.251374872, -271.573885136))
        Line((-729.251374872, -271.573885136), (-669.580893452, -293.292164237))
    # Sketch16 → Sweep1 (sweep)
    with BuildSketch(Plane.ZY.offset(198.4375)):
        with Locations((-1374.10182, 87.3252)):
            Circle(SKETCH16_R)
        with Locations((-1374.10182, 87.3252)):
            Circle(SKETCH16_R_2, mode=Mode.SUBTRACT)
    sweep(path=sweep1_path.line)


solid = Compound([part.part, body_2.part, body_3.part, body_4.part])
